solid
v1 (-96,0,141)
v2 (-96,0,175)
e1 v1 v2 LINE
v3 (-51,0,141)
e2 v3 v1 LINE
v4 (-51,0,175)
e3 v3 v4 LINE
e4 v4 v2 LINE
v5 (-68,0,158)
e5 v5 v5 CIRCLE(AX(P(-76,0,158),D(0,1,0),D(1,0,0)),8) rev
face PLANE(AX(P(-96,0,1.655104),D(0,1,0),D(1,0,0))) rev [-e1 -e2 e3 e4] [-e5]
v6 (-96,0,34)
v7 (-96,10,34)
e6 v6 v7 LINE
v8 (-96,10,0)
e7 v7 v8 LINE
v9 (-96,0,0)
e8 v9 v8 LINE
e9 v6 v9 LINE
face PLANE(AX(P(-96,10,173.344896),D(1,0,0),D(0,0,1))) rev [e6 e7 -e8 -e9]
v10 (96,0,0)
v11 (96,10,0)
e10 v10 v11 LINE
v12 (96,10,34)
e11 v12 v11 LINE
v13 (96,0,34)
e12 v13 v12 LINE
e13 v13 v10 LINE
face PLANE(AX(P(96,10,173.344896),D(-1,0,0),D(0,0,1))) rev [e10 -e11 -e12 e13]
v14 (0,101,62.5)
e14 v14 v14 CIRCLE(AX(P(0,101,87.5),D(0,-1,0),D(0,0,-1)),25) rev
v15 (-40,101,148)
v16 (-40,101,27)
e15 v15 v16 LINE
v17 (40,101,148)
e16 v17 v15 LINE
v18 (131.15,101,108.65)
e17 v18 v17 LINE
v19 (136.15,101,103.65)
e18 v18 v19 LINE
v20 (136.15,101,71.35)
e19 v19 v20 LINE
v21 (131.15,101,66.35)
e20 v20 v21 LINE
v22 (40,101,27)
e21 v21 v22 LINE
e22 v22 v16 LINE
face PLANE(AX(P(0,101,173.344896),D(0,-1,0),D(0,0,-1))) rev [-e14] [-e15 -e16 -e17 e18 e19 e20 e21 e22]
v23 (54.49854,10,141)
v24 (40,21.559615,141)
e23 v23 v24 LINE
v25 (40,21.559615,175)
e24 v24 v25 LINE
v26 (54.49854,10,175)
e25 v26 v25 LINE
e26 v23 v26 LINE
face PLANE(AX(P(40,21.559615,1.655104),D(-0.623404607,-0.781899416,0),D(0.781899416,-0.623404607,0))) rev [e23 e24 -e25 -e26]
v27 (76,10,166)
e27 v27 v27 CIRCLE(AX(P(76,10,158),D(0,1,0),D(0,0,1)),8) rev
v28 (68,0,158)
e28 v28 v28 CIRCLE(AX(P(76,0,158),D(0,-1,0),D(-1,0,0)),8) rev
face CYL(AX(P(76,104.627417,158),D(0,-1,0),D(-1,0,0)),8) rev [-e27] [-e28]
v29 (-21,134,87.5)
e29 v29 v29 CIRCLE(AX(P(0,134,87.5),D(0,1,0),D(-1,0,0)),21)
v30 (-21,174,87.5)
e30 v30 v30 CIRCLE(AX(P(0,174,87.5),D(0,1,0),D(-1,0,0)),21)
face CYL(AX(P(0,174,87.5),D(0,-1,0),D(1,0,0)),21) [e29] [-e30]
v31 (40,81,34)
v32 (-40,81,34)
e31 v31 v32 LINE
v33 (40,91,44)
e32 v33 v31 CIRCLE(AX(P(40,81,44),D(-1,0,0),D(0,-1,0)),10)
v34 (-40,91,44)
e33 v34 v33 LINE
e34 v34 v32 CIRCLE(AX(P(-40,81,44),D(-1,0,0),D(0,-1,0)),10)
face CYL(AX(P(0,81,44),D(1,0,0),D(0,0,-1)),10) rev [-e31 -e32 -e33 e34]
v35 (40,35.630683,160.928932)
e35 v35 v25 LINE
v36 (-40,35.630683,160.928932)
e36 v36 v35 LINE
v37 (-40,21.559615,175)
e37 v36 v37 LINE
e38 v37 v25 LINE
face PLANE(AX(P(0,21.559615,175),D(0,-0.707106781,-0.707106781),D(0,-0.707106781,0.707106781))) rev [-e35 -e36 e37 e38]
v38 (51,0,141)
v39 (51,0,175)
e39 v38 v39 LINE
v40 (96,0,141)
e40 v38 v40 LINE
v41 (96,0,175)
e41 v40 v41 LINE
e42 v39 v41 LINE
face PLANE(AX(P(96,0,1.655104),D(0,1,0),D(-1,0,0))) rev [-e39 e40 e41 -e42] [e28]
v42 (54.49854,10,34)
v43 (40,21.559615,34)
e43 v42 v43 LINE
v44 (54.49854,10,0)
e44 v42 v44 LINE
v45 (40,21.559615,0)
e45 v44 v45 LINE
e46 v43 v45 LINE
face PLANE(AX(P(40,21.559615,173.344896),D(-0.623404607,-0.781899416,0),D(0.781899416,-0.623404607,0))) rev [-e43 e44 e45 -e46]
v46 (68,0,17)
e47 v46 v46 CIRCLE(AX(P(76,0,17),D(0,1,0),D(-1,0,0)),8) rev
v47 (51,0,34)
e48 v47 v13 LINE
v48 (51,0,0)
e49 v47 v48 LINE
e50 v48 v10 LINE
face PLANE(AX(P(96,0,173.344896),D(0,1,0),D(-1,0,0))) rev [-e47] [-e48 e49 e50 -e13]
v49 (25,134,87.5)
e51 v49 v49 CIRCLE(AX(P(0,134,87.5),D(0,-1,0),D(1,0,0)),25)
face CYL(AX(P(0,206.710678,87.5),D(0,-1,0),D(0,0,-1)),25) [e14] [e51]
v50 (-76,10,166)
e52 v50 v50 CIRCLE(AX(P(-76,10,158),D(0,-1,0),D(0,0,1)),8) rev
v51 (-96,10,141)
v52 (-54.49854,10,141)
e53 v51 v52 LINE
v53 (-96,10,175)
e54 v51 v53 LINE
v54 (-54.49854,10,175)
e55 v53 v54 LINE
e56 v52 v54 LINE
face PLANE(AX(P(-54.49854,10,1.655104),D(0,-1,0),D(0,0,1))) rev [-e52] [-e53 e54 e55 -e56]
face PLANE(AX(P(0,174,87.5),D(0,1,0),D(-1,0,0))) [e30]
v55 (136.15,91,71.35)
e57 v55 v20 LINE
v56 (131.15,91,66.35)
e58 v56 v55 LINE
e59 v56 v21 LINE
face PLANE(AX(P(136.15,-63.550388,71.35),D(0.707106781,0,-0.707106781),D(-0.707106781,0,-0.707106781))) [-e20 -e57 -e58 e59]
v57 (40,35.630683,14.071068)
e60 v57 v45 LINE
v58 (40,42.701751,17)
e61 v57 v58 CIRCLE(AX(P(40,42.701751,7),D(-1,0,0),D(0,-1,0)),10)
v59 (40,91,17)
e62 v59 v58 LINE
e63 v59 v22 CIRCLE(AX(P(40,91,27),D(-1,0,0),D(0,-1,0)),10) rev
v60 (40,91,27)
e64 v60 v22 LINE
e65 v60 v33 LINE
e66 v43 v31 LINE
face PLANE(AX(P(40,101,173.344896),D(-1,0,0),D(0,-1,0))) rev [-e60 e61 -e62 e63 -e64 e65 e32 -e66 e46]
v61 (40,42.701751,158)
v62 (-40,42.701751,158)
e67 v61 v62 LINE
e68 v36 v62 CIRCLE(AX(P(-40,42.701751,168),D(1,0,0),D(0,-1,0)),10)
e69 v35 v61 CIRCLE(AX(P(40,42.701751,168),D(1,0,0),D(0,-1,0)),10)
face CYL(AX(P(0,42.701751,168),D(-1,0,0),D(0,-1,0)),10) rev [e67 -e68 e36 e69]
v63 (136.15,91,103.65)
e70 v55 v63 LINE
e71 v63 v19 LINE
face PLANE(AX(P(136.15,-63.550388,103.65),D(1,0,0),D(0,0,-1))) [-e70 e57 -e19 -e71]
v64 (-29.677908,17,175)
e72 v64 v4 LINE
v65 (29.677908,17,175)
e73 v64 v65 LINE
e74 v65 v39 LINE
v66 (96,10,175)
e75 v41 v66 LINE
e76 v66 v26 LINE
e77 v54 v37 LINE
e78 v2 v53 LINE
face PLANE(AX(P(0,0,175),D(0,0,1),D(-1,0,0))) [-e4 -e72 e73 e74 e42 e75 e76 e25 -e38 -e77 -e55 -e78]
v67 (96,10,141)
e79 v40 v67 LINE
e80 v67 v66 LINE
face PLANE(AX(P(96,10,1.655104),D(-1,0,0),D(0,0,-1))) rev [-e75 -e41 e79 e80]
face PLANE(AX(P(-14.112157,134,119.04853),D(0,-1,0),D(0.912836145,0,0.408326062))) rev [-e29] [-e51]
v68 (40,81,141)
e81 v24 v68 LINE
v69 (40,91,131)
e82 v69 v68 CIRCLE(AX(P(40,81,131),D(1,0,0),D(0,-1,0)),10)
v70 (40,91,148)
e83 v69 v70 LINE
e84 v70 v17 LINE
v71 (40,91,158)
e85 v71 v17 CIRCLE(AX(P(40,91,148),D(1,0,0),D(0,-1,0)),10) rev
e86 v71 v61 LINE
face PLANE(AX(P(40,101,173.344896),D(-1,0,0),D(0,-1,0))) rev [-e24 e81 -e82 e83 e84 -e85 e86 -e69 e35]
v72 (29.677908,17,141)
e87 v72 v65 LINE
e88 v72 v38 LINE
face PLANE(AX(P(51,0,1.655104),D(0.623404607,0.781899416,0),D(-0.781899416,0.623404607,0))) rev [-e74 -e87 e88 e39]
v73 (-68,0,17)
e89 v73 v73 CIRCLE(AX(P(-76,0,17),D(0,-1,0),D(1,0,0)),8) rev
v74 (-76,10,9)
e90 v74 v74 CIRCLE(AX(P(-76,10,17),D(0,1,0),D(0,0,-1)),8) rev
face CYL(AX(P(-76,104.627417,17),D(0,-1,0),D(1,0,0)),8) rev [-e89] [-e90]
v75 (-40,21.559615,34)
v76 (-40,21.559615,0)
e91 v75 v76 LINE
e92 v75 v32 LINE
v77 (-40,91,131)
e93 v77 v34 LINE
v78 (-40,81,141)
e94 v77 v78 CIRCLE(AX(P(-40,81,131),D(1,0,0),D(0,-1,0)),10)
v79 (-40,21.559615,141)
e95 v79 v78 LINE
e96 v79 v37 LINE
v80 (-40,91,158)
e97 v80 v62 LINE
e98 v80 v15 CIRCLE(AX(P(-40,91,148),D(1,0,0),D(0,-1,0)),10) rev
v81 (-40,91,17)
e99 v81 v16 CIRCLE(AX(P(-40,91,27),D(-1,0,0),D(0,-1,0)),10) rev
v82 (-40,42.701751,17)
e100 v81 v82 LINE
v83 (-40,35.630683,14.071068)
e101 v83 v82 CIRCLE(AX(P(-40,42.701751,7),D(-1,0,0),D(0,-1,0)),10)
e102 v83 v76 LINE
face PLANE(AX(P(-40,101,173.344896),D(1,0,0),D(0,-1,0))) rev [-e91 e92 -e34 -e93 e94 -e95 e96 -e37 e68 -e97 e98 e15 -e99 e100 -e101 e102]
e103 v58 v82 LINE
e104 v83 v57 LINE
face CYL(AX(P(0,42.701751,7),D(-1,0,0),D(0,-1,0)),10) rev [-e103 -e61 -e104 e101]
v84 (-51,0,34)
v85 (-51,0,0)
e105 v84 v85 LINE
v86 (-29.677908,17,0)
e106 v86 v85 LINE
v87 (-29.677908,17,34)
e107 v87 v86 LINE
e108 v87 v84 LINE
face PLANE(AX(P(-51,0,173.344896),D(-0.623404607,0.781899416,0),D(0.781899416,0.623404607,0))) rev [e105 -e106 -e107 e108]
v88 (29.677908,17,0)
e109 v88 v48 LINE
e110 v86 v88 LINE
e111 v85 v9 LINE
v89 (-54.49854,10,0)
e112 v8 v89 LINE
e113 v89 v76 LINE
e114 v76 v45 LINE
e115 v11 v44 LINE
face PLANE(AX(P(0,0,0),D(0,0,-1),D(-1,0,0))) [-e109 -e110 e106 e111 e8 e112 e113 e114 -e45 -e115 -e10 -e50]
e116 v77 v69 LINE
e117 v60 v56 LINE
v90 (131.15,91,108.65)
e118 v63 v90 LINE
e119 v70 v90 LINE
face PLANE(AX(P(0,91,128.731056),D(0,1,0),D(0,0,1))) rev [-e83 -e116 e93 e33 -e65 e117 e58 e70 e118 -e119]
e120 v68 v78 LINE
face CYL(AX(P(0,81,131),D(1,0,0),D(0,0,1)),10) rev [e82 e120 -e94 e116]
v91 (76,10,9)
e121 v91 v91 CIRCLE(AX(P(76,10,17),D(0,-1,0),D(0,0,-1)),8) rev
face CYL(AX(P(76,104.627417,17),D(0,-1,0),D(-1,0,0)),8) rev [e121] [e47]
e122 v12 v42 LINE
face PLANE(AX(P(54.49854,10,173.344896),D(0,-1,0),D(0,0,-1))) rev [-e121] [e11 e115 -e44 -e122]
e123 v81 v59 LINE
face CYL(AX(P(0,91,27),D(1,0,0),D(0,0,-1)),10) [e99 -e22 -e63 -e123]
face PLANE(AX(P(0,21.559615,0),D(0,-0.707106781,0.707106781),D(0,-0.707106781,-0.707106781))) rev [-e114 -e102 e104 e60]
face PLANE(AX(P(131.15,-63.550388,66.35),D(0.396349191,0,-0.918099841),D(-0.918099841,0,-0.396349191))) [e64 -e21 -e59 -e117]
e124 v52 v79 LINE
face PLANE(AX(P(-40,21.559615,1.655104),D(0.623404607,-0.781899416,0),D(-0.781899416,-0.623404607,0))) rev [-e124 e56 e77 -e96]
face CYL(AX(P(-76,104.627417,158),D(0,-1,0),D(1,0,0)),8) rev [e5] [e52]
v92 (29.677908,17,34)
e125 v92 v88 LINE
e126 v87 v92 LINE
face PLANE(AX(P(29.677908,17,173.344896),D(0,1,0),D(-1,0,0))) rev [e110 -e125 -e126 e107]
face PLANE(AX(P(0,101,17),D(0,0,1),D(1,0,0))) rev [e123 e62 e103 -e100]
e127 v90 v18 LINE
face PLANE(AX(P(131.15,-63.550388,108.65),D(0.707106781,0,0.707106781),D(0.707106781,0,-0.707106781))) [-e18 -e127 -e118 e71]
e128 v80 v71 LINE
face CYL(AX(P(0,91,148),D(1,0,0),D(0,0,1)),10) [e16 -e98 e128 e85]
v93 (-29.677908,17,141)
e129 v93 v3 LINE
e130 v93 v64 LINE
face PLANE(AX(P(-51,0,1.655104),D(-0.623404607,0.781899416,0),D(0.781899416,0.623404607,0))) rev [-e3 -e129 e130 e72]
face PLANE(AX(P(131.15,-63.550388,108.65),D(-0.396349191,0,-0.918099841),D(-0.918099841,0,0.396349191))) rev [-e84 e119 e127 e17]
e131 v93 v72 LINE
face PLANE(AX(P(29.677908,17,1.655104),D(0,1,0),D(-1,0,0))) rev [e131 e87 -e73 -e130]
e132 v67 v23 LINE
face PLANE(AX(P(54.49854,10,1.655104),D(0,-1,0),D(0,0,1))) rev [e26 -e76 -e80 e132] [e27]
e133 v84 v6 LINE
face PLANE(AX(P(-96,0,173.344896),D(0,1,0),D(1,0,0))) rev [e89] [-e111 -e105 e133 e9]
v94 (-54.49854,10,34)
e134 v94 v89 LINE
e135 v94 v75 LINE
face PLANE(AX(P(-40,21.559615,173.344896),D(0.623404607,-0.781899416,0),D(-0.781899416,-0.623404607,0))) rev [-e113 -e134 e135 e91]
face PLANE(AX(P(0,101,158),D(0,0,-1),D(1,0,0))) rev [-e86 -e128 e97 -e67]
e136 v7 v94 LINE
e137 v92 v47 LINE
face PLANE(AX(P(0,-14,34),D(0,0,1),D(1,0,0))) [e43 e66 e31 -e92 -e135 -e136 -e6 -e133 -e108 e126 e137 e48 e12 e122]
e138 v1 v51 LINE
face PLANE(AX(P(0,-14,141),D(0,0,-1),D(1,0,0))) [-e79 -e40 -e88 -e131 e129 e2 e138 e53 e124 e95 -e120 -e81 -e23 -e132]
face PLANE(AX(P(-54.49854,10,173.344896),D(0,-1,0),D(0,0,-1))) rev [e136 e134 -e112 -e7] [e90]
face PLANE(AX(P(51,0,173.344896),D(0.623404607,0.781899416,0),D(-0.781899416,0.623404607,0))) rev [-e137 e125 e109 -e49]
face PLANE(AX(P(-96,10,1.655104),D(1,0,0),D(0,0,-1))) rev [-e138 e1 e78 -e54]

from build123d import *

# Parameters (mm, degrees)
EXTRUDE_1_DEPTH     = 34
OTHER_1_OUTLINE_R   = 8
OTHER_1_DEPTH       = 10
SKETCH_2_W          = 40
SKETCH_2_H          = 10
EXTRUDE_2_DEPTH     = 53.5
CUT_EXTRUDE_1_DEPTH = 145.890475877
FILLET_1_R          = 10
SKETCH_4_R          = 25
EXTRUDE_3_DEPTH     = 33
SKETCH_5_R          = 21
EXTRUDE_4_DEPTH     = 40
EXTRUDE_5_DEPTH     = 10


# Read off the part's stored shape, not the designer's step: Полость1
with BuildPart() as part:
    # Эскиз1 → Бобышка-Вытянуть1 (new body)
    with BuildSketch(Plane.XY):
        Polygon((96, 0), (51, 0), (29.67790849, 17), (0, 17), (0, 101), (40, 101), (40, 21.559615382), (54.498539822, 10), (96, 10), align=None)
    extrude(amount=EXTRUDE_1_DEPTH)

    # Полость1 outline → Полость1 (cut)
    with BuildSketch(Plane(origin=(0, 0, 0), x_dir=(1, 0, 0), z_dir=(0, 1, 0))):
        with Locations((76, -17)):
            Circle(OTHER_1_OUTLINE_R)
    extrude(amount=OTHER_1_DEPTH, mode=Mode.SUBTRACT)

    # Эскиз2 → Бобышка-Вытянуть2 (add)
    with BuildSketch(Plane.XY.offset(34)):
        with Locations((20, 96)):
            Rectangle(SKETCH_2_W, SKETCH_2_H)
    extrude(amount=EXTRUDE_2_DEPTH)

    # Эскиз3 → Вырез-Вытянуть1 (cut, through all)
    with BuildSketch(Plane(origin=(40, 0, 0), x_dir=(0, 0, -1), z_dir=(1, 0, 0))):
        Polygon((0, 101), (-17, 101), (-17, 38.559615382), (0, 21.559615382), align=None)
    extrude(amount=-CUT_EXTRUDE_1_DEPTH, mode=Mode.SUBTRACT)

    # Скругление1
    fillet_1_edges = [part.edges().sort_by_distance(p)[0] for p in [
        (20, 91, 34),
        (20, 38.559615382, 17),
        (20, 101, 17),
    ]]
    fillet(fillet_1_edges, radius=FILLET_1_R)

    # Зеркальное отражение1: part across plane


with BuildPart() as part_1:
    add(part.part)
    add(part.part.mirror(Plane(origin=(0, 17, 173.344895852), x_dir=(0, 0, 1), z_dir=(1, 0, 0))))

    # Зеркальное отражение2: part across plane


with BuildPart() as part_2:
    add(part_1.part)
    add(part_1.part.mirror(Plane(origin=(0, -14, 87.5), x_dir=(1, 0, 0), z_dir=(0, 0, 1))))

    # Эскиз4 → Бобышка-Вытянуть3 (add)
    with BuildSketch(Plane(origin=(0, 101, 0), x_dir=(1, 0, 0), z_dir=(0, 1, 0))):
        with Locations(Location((0, -87.5, 0), (0, 0, 90))):
            Circle(SKETCH_4_R)
    extrude(amount=EXTRUDE_3_DEPTH)

    # Эскиз5 → Бобышка-Вытянуть4 (add)
    with BuildSketch(Plane(origin=(0, 134, 0), x_dir=(1, 0, 0), z_dir=(0, 1, 0))):
        with Locations(Location((0, -87.5, 0), (0, 0, 180))):
            Circle(SKETCH_5_R)
    extrude(amount=EXTRUDE_4_DEPTH)

    # Эскиз6 → Бобышка-Вытянуть5 (add)
    with BuildSketch(Plane(origin=(0, 101, 0), x_dir=(1, 0, 0), z_dir=(0, 1, 0))):
        Polygon((131.15, -108.65), (136.15, -103.65), (136.15, -71.35), (131.15, -66.35), (40, -27), (40, -148), align=None)
    extrude(amount=-EXTRUDE_5_DEPTH)


solid = part_2.part
